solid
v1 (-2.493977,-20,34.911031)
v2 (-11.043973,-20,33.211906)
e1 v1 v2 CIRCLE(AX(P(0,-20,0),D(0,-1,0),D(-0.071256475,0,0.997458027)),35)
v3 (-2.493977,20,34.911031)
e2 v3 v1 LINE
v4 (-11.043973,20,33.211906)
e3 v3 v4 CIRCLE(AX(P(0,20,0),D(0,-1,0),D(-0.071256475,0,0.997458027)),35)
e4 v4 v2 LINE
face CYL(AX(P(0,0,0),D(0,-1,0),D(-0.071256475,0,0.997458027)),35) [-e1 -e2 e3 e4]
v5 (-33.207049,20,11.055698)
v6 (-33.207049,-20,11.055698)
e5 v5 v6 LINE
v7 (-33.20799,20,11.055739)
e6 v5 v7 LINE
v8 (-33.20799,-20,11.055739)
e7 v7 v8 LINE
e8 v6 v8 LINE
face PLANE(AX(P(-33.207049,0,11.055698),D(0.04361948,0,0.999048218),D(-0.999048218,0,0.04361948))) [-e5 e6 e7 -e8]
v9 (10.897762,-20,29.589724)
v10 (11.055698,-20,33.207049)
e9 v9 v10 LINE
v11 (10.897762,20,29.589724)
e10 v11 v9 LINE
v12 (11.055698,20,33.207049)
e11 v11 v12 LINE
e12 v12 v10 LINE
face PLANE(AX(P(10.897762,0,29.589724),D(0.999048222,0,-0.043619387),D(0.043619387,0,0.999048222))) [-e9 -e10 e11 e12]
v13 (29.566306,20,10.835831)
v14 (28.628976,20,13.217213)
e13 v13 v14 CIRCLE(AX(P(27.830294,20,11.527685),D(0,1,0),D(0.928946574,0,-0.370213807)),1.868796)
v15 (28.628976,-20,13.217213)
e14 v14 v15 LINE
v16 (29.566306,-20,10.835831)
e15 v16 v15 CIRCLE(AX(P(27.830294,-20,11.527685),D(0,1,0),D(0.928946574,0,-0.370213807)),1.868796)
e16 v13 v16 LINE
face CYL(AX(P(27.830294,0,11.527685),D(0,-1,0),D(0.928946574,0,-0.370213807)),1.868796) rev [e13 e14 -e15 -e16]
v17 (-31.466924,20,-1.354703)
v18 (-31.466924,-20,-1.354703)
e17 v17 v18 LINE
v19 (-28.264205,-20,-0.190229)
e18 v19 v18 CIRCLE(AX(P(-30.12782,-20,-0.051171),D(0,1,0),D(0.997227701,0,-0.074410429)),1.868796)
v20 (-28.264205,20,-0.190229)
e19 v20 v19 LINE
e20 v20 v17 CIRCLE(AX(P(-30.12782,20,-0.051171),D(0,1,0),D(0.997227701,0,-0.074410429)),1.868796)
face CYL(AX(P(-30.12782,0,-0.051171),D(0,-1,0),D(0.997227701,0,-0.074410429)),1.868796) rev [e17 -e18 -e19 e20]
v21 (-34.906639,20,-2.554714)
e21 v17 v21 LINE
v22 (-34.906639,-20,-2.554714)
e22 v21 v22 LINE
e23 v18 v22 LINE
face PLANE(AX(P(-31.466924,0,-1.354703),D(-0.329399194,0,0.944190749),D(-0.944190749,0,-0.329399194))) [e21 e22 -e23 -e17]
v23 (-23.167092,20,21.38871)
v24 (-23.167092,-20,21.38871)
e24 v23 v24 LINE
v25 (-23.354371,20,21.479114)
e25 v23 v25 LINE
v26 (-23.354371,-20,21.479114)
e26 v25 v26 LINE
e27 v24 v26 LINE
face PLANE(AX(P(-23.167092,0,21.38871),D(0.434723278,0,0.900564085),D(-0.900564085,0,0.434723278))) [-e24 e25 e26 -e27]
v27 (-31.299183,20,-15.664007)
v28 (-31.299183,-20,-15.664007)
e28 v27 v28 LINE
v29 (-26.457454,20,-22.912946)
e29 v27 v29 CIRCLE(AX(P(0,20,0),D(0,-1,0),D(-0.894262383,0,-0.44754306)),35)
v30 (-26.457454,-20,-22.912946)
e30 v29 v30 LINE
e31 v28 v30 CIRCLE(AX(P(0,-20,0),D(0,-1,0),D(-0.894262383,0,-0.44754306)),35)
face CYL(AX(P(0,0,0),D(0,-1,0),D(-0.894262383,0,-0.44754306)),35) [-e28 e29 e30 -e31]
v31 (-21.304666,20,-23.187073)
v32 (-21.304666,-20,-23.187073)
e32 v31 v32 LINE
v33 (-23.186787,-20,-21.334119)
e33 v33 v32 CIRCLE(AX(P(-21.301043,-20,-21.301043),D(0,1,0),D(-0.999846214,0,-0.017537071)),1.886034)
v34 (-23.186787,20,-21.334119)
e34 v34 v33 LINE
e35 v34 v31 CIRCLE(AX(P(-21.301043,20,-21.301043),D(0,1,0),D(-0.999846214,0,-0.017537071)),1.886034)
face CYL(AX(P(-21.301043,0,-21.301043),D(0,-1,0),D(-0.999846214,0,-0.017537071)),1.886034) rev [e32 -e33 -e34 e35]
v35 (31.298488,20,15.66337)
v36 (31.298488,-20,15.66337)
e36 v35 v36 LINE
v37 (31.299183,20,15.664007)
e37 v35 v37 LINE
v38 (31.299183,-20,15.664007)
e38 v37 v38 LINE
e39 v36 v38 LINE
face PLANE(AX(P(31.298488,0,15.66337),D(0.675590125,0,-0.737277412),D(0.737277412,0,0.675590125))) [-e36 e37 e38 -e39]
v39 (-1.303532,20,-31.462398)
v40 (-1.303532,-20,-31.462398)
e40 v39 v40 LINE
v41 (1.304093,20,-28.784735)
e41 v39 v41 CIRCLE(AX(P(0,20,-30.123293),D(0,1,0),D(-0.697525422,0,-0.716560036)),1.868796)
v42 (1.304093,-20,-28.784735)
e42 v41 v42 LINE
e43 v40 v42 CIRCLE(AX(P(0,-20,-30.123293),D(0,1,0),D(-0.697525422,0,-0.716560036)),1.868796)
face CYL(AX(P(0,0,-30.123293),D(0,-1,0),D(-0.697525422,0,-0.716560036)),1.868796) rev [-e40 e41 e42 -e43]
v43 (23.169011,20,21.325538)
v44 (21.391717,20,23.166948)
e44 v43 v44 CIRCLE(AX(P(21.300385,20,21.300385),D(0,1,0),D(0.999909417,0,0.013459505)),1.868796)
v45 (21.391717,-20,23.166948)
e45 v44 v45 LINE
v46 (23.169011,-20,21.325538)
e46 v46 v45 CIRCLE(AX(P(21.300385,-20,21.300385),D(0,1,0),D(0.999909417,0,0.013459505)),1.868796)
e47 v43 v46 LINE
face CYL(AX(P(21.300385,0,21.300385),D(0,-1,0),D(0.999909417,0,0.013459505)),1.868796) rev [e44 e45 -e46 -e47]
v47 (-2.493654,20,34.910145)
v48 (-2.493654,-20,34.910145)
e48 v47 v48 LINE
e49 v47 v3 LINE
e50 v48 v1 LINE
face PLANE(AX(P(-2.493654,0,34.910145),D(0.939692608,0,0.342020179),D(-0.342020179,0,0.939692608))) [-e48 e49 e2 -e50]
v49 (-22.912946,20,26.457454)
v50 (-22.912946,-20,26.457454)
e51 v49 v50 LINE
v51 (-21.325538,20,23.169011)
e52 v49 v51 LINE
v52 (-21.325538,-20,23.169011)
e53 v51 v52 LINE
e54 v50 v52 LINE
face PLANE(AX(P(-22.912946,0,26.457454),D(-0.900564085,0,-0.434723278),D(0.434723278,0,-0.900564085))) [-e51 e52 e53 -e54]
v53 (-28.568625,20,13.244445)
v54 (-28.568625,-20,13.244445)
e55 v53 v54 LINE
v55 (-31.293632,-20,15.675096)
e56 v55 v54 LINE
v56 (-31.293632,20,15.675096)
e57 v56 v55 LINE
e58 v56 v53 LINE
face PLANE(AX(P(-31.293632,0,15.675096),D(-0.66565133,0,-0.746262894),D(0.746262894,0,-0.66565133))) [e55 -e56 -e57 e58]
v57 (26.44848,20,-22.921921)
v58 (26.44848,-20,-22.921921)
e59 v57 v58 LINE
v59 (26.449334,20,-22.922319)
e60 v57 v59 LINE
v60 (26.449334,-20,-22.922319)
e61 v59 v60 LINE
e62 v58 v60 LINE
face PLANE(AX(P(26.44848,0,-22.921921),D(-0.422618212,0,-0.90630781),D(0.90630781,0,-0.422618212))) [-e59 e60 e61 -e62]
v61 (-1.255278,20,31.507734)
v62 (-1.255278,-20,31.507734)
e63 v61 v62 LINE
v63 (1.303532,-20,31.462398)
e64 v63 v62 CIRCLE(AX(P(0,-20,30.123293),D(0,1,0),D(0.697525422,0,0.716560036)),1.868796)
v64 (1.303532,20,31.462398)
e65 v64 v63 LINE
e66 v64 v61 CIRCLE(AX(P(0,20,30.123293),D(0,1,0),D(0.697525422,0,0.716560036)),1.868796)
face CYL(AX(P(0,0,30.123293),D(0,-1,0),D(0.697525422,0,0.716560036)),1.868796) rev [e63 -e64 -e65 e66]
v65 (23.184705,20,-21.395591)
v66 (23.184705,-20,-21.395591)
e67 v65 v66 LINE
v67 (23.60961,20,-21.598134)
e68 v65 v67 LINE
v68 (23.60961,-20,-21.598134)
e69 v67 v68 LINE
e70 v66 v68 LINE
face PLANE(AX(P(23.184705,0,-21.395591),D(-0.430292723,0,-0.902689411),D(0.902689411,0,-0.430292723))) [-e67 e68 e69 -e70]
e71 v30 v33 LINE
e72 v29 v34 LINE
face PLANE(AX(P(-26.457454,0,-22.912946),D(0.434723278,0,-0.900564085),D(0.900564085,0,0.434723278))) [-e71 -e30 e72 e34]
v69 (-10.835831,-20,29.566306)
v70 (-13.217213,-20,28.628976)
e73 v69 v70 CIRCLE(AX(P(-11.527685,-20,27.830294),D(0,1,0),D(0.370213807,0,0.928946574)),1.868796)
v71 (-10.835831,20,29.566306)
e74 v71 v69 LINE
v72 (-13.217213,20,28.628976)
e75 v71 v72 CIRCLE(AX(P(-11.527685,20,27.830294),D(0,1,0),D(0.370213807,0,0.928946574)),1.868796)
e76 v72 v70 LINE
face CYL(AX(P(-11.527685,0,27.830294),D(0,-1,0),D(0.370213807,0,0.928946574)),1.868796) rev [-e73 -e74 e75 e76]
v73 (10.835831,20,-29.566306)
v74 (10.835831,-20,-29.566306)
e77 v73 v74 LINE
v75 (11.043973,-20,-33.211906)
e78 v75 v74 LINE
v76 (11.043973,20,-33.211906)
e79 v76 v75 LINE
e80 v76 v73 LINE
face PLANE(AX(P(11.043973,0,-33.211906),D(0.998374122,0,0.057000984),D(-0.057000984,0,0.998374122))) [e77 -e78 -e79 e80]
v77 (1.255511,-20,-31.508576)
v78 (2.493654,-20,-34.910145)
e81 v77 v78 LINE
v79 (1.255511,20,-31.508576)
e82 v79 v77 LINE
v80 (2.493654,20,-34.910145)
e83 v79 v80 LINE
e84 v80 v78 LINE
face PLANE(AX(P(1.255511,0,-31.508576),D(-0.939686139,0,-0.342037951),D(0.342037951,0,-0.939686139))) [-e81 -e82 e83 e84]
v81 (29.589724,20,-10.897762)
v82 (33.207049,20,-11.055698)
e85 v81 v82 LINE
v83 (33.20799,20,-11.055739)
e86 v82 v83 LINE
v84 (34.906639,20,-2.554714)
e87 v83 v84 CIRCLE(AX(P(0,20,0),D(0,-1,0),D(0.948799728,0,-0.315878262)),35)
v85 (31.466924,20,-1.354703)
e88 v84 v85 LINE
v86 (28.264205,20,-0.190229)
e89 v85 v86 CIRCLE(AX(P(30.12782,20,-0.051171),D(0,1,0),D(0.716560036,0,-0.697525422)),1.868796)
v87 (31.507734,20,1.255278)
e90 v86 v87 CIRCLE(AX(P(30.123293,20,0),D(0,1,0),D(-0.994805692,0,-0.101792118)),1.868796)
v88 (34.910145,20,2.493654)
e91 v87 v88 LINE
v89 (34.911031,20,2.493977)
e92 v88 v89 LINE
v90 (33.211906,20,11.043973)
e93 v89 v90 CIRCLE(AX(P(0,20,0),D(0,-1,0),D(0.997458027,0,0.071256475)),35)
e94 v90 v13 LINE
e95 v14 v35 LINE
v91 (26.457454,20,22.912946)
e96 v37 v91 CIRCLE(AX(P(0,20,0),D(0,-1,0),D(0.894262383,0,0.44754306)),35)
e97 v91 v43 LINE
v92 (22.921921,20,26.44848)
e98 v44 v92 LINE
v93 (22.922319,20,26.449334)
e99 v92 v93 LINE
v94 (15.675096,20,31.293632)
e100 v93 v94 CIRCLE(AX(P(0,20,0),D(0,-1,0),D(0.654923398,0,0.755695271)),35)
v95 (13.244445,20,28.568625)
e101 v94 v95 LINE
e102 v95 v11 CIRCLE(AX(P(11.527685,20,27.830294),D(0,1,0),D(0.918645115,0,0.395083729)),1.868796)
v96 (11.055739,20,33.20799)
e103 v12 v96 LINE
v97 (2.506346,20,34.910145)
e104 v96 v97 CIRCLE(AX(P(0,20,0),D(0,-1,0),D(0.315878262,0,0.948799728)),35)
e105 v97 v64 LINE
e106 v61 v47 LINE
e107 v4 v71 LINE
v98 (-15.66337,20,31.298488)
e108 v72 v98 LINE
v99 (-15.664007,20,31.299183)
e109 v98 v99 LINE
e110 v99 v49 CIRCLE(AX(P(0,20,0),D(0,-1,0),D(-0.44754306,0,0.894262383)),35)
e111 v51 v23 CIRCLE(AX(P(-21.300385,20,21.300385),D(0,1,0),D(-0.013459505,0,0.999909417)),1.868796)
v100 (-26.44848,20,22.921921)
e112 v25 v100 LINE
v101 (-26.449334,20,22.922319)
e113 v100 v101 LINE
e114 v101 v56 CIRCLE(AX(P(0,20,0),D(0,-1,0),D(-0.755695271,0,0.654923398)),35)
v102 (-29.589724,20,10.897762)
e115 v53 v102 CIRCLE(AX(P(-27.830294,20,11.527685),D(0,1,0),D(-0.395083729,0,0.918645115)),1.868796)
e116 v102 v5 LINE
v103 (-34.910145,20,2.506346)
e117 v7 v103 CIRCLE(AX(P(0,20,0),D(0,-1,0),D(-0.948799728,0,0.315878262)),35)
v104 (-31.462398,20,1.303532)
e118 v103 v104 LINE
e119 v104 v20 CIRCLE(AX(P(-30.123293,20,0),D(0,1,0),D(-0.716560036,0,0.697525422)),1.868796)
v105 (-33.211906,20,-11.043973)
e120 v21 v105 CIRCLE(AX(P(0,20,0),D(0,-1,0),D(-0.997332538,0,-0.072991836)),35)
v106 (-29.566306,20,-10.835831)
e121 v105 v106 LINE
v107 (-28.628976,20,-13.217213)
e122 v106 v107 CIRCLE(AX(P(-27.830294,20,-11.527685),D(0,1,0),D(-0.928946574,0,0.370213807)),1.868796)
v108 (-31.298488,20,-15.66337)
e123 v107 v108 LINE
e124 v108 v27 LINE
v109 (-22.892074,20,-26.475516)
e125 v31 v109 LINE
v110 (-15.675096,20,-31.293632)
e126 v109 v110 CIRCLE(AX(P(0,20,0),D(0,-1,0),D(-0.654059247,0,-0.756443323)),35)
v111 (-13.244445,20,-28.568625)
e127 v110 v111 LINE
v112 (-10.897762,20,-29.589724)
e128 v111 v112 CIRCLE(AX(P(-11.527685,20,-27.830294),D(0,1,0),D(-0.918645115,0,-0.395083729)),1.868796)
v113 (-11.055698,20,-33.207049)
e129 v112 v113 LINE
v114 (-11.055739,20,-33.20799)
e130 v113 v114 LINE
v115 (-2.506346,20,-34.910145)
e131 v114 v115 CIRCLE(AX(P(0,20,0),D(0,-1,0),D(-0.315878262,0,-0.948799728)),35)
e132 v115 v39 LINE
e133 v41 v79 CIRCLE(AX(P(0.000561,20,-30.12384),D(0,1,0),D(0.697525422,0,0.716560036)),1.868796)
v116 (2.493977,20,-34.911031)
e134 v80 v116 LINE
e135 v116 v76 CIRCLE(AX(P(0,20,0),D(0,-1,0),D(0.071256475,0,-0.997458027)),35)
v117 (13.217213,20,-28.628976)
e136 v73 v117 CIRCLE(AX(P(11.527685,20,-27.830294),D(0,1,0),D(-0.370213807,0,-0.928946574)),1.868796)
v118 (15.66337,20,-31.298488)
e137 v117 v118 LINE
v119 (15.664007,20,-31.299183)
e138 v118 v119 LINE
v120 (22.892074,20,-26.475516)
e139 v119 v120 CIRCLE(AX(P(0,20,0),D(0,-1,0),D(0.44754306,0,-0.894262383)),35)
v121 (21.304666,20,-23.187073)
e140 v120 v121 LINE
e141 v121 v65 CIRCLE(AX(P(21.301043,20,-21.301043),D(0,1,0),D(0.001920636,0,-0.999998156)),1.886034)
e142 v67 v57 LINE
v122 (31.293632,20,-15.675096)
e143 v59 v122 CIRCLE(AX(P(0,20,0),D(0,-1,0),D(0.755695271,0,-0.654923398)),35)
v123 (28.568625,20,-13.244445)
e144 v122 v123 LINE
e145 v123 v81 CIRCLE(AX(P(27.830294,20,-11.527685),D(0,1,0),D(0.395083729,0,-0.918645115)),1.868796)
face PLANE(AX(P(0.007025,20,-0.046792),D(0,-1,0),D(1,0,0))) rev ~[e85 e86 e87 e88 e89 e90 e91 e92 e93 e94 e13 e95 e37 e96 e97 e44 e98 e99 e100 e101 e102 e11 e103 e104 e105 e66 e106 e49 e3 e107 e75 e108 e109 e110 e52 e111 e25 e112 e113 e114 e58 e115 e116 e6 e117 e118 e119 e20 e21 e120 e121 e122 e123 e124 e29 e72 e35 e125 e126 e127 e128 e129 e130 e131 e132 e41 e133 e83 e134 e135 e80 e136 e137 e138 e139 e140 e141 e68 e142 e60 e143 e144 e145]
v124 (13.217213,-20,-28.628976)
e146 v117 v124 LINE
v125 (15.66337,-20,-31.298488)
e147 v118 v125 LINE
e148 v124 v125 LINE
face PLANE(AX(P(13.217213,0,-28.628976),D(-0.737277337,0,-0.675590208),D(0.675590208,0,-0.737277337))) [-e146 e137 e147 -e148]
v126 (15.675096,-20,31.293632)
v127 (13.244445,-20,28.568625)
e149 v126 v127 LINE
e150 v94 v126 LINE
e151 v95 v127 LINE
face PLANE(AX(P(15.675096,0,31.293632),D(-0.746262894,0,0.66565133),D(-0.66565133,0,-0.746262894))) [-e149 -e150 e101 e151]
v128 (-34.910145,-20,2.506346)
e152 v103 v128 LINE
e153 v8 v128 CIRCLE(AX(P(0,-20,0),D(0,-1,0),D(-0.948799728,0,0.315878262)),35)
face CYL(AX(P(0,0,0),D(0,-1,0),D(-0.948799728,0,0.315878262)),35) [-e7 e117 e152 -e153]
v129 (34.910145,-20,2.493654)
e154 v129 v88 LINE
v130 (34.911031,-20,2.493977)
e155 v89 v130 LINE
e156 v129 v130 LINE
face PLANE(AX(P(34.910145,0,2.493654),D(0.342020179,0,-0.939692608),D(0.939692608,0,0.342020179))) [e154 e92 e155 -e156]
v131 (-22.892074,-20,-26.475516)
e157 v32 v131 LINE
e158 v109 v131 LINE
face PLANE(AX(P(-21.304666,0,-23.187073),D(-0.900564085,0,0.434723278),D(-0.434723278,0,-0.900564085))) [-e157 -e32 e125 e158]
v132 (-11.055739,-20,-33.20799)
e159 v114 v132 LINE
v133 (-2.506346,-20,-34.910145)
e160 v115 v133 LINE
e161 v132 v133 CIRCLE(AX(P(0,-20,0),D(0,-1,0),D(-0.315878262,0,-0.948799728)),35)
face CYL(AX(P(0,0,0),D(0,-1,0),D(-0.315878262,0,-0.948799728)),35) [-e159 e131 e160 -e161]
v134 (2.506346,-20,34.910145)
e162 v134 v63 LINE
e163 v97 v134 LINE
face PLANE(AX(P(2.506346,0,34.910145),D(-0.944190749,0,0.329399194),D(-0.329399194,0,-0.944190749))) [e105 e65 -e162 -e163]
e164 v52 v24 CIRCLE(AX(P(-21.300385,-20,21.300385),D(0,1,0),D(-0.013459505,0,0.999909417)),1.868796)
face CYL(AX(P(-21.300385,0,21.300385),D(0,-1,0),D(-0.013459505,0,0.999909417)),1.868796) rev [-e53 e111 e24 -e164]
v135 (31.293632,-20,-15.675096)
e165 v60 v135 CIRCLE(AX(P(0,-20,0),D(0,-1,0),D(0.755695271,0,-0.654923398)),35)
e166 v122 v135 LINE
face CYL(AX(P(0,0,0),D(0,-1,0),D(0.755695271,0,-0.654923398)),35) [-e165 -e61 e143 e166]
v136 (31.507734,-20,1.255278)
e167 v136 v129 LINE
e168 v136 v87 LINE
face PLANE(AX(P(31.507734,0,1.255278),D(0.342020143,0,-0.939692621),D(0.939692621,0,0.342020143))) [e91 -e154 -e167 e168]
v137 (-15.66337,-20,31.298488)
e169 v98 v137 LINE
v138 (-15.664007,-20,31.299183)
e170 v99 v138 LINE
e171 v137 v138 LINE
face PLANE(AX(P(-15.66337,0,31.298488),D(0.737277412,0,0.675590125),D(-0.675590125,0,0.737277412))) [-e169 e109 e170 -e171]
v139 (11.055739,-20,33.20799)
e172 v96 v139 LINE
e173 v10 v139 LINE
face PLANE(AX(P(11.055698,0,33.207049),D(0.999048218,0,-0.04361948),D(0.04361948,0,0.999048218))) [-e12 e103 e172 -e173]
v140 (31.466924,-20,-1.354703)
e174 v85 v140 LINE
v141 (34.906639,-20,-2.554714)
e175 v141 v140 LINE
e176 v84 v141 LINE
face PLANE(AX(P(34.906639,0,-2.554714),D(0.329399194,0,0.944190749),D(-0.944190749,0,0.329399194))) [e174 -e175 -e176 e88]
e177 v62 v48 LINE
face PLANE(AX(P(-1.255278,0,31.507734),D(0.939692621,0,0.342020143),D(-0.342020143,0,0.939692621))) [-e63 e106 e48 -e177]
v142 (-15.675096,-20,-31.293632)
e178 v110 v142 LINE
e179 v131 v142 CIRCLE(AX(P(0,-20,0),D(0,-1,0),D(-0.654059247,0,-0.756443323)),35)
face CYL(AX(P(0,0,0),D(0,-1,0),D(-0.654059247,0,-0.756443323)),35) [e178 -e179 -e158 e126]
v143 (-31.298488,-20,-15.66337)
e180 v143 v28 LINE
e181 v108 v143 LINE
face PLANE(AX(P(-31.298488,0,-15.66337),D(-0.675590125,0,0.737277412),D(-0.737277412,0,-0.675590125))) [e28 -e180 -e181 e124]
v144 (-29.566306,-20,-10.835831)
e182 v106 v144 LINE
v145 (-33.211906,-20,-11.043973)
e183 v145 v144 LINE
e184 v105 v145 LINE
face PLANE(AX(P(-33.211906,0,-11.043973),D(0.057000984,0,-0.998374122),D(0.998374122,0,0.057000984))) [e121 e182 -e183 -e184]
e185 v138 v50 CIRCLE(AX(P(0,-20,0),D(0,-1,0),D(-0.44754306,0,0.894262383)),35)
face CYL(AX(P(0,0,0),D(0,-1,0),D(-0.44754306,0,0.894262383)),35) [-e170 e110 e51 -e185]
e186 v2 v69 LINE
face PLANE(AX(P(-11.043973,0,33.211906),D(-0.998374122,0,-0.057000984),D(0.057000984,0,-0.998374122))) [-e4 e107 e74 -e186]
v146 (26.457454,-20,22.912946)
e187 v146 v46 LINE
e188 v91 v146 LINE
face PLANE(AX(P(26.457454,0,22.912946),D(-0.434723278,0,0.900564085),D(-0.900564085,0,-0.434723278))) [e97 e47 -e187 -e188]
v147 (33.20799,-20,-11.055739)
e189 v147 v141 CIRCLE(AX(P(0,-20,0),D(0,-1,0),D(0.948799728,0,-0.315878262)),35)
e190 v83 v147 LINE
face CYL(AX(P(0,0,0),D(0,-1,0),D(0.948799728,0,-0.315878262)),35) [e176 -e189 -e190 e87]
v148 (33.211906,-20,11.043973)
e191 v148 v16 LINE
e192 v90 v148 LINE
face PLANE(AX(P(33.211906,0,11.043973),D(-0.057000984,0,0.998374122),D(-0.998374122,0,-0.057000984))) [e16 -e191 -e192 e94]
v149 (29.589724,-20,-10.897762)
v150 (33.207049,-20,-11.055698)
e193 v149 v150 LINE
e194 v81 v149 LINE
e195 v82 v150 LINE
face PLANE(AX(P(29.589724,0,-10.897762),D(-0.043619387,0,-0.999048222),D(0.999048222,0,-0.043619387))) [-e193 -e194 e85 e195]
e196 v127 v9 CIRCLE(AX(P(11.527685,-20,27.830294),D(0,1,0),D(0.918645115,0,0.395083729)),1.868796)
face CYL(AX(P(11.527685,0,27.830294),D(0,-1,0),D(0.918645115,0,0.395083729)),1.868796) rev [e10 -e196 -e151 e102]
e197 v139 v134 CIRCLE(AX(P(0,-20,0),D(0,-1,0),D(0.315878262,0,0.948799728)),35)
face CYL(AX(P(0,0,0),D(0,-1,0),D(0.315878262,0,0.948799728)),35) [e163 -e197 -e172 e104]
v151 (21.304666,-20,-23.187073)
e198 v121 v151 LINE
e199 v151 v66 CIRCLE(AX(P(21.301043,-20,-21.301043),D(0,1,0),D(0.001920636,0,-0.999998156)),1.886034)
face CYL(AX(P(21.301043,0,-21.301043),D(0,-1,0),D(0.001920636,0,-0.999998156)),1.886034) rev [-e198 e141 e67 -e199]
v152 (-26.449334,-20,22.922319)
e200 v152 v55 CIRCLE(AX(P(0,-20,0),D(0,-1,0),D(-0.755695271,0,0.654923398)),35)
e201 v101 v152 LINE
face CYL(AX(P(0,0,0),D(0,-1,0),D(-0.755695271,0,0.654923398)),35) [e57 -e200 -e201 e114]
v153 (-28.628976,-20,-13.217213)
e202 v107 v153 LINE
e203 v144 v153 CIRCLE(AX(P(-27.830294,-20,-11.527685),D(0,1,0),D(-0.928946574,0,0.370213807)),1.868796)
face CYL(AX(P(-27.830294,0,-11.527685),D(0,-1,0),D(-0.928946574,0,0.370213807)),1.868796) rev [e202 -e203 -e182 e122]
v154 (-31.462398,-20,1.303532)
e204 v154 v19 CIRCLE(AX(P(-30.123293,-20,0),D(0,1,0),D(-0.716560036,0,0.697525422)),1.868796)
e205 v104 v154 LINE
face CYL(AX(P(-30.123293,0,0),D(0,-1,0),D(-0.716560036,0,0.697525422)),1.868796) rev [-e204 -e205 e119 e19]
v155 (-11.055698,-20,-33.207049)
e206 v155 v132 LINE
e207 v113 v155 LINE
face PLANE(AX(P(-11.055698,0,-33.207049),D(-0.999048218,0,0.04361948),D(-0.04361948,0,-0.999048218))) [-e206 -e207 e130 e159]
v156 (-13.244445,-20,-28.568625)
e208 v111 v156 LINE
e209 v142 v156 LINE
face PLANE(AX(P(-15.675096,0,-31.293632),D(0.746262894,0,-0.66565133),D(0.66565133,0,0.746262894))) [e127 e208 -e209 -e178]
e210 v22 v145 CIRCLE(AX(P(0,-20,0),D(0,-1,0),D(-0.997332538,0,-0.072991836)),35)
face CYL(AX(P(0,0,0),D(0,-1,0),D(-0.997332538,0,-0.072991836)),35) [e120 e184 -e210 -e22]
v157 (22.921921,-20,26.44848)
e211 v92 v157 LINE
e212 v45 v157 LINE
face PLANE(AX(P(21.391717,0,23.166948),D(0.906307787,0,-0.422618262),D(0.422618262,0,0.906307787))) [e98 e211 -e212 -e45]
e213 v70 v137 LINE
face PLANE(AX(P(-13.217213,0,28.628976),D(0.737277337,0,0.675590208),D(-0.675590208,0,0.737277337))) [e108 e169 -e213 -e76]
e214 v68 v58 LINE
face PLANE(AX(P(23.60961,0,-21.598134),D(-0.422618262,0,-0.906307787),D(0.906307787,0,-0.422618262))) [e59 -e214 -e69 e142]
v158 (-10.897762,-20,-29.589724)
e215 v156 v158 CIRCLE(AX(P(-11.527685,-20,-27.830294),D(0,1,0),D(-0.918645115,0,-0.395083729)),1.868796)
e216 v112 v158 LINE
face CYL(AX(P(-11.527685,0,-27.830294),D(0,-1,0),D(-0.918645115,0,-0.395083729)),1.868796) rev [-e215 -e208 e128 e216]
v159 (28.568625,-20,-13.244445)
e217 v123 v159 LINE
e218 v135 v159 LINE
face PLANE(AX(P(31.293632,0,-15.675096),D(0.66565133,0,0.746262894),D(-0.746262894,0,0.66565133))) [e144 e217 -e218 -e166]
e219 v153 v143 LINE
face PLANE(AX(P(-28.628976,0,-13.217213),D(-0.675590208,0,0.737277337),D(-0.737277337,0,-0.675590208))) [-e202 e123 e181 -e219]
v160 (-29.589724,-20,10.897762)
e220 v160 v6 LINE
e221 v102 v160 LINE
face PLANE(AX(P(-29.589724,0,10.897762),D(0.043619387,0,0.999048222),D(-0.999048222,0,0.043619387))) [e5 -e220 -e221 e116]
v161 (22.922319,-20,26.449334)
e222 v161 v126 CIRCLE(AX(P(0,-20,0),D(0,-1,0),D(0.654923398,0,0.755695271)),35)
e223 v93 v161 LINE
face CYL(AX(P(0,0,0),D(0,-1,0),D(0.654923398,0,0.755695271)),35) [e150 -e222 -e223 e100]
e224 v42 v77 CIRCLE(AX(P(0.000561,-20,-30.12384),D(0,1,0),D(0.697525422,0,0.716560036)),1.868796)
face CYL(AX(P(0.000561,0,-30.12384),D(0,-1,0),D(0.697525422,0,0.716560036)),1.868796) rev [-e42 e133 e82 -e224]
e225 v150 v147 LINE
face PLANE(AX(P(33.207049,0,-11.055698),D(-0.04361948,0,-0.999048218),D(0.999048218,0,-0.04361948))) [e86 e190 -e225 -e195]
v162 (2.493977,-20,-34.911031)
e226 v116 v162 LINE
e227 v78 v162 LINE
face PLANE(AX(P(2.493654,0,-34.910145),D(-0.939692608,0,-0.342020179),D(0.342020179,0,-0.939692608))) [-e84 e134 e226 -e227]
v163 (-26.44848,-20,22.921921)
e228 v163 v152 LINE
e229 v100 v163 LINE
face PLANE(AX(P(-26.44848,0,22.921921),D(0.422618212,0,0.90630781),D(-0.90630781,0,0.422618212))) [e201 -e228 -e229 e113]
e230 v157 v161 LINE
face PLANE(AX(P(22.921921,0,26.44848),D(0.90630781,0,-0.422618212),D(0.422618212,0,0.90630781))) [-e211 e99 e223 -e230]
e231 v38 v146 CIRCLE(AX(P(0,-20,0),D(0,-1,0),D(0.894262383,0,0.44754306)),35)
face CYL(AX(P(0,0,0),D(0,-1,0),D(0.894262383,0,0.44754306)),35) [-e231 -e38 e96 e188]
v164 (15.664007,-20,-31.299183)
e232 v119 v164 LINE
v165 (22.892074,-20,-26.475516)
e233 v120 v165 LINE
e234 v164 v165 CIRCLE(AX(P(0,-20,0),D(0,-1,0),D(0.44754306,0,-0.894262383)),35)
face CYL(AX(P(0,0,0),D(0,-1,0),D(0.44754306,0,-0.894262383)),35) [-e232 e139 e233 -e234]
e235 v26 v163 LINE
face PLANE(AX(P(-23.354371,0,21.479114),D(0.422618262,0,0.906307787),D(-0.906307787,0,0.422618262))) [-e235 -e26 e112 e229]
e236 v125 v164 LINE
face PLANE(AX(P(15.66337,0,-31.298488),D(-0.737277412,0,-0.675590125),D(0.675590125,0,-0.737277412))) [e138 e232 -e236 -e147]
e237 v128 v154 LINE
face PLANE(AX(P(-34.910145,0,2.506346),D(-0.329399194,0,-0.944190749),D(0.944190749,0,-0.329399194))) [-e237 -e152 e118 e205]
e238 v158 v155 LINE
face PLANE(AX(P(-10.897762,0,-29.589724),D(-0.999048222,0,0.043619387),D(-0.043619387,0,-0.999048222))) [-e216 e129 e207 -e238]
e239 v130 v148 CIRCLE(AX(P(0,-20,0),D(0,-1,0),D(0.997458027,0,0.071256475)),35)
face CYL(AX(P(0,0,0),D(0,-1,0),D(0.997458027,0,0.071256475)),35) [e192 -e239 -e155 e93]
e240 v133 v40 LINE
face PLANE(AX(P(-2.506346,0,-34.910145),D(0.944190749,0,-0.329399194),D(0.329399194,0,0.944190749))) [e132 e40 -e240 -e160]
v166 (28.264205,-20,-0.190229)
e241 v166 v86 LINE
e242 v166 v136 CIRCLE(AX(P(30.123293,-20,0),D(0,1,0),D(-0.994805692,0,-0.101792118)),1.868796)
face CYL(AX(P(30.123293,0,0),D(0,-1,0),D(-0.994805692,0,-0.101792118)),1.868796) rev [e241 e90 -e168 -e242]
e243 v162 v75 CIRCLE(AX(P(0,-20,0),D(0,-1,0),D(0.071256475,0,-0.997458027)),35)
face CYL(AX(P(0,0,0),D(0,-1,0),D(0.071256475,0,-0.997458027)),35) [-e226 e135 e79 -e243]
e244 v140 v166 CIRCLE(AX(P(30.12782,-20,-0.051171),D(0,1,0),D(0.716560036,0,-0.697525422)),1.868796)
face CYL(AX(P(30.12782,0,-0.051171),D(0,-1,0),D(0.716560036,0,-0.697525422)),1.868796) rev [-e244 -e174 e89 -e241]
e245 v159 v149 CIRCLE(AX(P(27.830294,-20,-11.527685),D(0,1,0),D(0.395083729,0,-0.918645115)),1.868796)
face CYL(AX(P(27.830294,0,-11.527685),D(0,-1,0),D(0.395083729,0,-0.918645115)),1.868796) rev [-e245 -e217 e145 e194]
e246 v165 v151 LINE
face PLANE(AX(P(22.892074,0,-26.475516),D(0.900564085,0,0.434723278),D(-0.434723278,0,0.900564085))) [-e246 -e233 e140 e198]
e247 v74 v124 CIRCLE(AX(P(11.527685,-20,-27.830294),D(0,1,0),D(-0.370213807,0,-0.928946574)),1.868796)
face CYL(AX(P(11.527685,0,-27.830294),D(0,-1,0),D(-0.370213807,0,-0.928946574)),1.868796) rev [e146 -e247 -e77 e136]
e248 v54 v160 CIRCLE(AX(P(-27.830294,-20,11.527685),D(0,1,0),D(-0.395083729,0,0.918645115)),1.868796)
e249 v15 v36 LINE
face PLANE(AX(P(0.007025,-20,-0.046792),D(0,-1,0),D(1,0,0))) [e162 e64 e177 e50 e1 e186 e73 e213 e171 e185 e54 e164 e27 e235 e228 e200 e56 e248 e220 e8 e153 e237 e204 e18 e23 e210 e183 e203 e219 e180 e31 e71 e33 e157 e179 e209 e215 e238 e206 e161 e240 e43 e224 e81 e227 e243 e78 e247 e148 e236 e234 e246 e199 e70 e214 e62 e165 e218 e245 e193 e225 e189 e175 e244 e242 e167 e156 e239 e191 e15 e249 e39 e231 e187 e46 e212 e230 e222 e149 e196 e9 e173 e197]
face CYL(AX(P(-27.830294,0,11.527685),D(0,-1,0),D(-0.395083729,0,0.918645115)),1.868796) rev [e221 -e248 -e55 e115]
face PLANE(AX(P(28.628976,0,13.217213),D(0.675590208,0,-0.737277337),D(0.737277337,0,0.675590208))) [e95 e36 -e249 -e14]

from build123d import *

# Parameters (mm, degrees)
F1_DEPTH = 20


# Not quite as in the source:
# - ends of sketch curves that miss each other by under 0.0002 mm in the source are joined


with BuildPart() as f1:
    # F0 (on Front) → F1 (new body, symmetric)
    with BuildSketch(Plane.XZ):
        with BuildLine():
            Line((34.9101450984, 2.4936542119), (34.9110309298, 2.4939766282))
            ThreePointArc((34.9110309298, 2.4939766282), (34.3286939173, 6.8220798831), (33.2119055423, 11.0439725756))
            Line((33.2119055423, 11.0439725756), (29.5663055038, 10.8358313755))
            ThreePointArc((29.5663055038, 10.8358313755), (26.0913542461, 10.8432258269), (28.6289762641, 13.2172130666))
            Line((28.6289762641, 13.2172130666), (31.2984883804, 15.6633702382))
            Line((31.2984883804, 15.6633702382), (31.2991833986, 15.6640071049))
            ThreePointArc((31.2991833986, 15.6640071049), (29.1048807425, 19.4398023901), (26.457454434, 22.9129462285))
            Line((26.457454434, 22.9129462285), (23.1690113636, 21.3255380981))
            ThreePointArc((23.1690113636, 21.3255380981), (19.9557452862, 20.0025634058), (21.3917167446, 23.1669475309))
            Line((21.3917167446, 23.1669475309), (22.9219205281, 26.4484801345))
            Line((22.9219205281, 26.4484801345), (22.9223189227, 26.4493344946))
            ThreePointArc((22.9223189227, 26.4493344946), (19.450113311, 29.0979912054), (15.6750957256, 31.2936315245))
            Line((15.6750957256, 31.2936315245), (13.2444452709, 28.5686249618))
            ThreePointArc((13.2444452709, 28.5686249618), (10.7820550057, 26.1166920299), (10.897762267, 29.5897242426))
            Line((10.897762267, 29.5897242426), (11.055698063, 33.2070486864))
            Line((11.055698063, 33.2070486864), (11.0557391823, 33.2079904712))
            ThreePointArc((11.0557391823, 33.2079904712), (6.8342424437, 34.3262746336), (2.5063457881, 34.9101450984))
            Line((2.5063457881, 34.9101450984), (1.3035324469, 31.4623976502))
            ThreePointArc((1.3035324469, 31.4623976502), (-0.0331054099, 28.2547910408), (-1.2552777272, 31.5077336698))
            Line((-1.2552777272, 31.5077336698), (-2.4936542119, 34.9101450984))
            Line((-2.4936542119, 34.9101450984), (-2.4939766282, 34.9110309298))
            ThreePointArc((-2.4939766282, 34.9110309298), (-6.8220798831, 34.3286939173), (-11.0439725756, 33.2119055423))
            Line((-11.0439725756, 33.2119055423), (-10.8358313755, 29.5663055038))
            ThreePointArc((-10.8358313755, 29.5663055038), (-10.8432258269, 26.0913542461), (-13.2172130666, 28.6289762641))
            Line((-13.2172130666, 28.6289762641), (-15.6633702382, 31.2984883804))
            Line((-15.6633702382, 31.2984883804), (-15.6640071049, 31.2991833986))
            ThreePointArc((-15.6640071049, 31.2991833986), (-19.4398023901, 29.1048807425), (-22.9129462285, 26.457454434))
            Line((-22.9129462285, 26.457454434), (-21.3255380981, 23.1690113636))
            ThreePointArc((-21.3255380981, 23.1690113636), (-20.0014808321, 19.9567910089), (-23.1670922293, 21.3887099076))
            Line((-23.1670922293, 21.3887099076), (-23.3543714527, 21.4791139546))
            Line((-23.3543714527, 21.4791139546), (-26.4484801345, 22.9219205281))
            Line((-26.4484801345, 22.9219205281), (-26.4493344946, 22.9223189227))
            ThreePointArc((-26.4493344946, 22.9223189227), (-29.0979912054, 19.450113311), (-31.2936315245, 15.6750957256))
            Line((-31.2936315245, 15.6750957256), (-28.5686249618, 13.2444452709))
            ThreePointArc((-28.5686249618, 13.2444452709), (-26.1166920299, 10.7820550057), (-29.5897242426, 10.897762267))
            Line((-29.5897242426, 10.897762267), (-33.2070486864, 11.055698063))
            Line((-33.2070486864, 11.055698063), (-33.2079904712, 11.0557391823))
            ThreePointArc((-33.2079904712, 11.0557391823), (-34.3262746336, 6.8342424437), (-34.9101450984, 2.5063457881))
            Line((-34.9101450984, 2.5063457881), (-31.4623976502, 1.3035324469))
            ThreePointArc((-31.4623976502, 1.3035324469), (-29.3324543071, 1.6932130885), (-28.2642048894, -0.1902286623))
            ThreePointArc((-28.2642048894, -0.1902286623), (-29.4892446104, -1.8074791131), (-31.4669238904, -1.3547032257))
            Line((-31.4669238904, -1.3547032257), (-34.9066388382, -2.5547142739))
            ThreePointArc((-34.9066388382, -2.5547142739), (-34.3227460841, -6.8519414215), (-33.2119055423, -11.0439725756))
            Line((-33.2119055423, -11.0439725756), (-29.5663055038, -10.8358313755))
            ThreePointArc((-29.5663055038, -10.8358313755), (-26.0913542461, -10.8432258269), (-28.6289762641, -13.2172130666))
            Line((-28.6289762641, -13.2172130666), (-31.2984883804, -15.6633702382))
            Line((-31.2984883804, -15.6633702382), (-31.2991833986, -15.6640071049))
            ThreePointArc((-31.2991833986, -15.6640071049), (-29.1048807425, -19.4398023901), (-26.457454434, -22.9129462285))
            Line((-26.457454434, -22.9129462285), (-23.1867866645, -21.3341186503))
            ThreePointArc((-23.1867866645, -21.3341186503), (-19.9778704256, -19.9570429396), (-21.3046655311, -23.1870732319))
            Line((-21.3046655311, -23.1870732319), (-22.8920736615, -26.4755163023))
            ThreePointArc((-22.8920736615, -26.4755163023), (-19.4334813455, -29.1091017174), (-15.6750957256, -31.2936315245))
            Line((-15.6750957256, -31.2936315245), (-13.2444452709, -28.5686249618))
            ThreePointArc((-13.2444452709, -28.5686249618), (-10.7820550057, -26.1166920299), (-10.897762267, -29.5897242426))
            Line((-10.897762267, -29.5897242426), (-11.055698063, -33.2070486864))
            Line((-11.055698063, -33.2070486864), (-11.0557391823, -33.2079904712))
            ThreePointArc((-11.0557391823, -33.2079904712), (-6.8342424437, -34.3262746336), (-2.5063457881, -34.9101450984))
            Line((-2.5063457881, -34.9101450984), (-1.3035324469, -31.4623976502))
            ThreePointArc((-1.3035324469, -31.4623976502), (-1.3388311966, -28.8194805066), (1.3040932823, -28.7847353157))
            ThreePointArc((1.3040932823, -28.7847353157), (1.8690592706, -30.1571657006), (1.2555114416, -31.5085763676))
            Line((1.2555114416, -31.5085763676), (2.4936542119, -34.9101450984))
            Line((2.4936542119, -34.9101450984), (2.4939766282, -34.9110309298))
            ThreePointArc((2.4939766282, -34.9110309298), (6.8220798831, -34.3286939173), (11.0439725756, -33.2119055423))
            Line((11.0439725756, -33.2119055423), (10.8358313755, -29.5663055038))
            ThreePointArc((10.8358313755, -29.5663055038), (10.8432258269, -26.0913542461), (13.2172130666, -28.6289762641))
            Line((13.2172130666, -28.6289762641), (15.6633702382, -31.2984883804))
            Line((15.6633702382, -31.2984883804), (15.6640071049, -31.2991833986))
            ThreePointArc((15.6640071049, -31.2991833986), (19.4283242222, -29.112543996), (22.8920736615, -26.4755163023))
            Line((22.8920736615, -26.4755163023), (21.3046655311, -23.1870732319))
            ThreePointArc((21.3046655311, -23.1870732319), (19.9999615902, -19.9356459921), (23.1847053682, -21.3955906956))
            Line((23.1847053682, -21.3955906956), (23.6096103837, -21.5981338228))
            Line((23.6096103837, -21.5981338228), (26.4484801345, -22.9219205281))
            Line((26.4484801345, -22.9219205281), (26.4493344946, -22.9223189227))
            ThreePointArc((26.4493344946, -22.9223189227), (29.0979912054, -19.450113311), (31.2936315245, -15.6750957256))
            Line((31.2936315245, -15.6750957256), (28.5686249618, -13.2444452709))
            ThreePointArc((28.5686249618, -13.2444452709), (26.1166920299, -10.7820550057), (29.5897242426, -10.897762267))
            Line((29.5897242426, -10.897762267), (33.2070486864, -11.055698063))
            Line((33.2070486864, -11.055698063), (33.2079904712, -11.0557391823))
            ThreePointArc((33.2079904712, -11.0557391823), (34.3215316909, -6.8580217548), (34.9066388382, -2.5547142739))
            Line((34.9066388382, -2.5547142739), (31.4669238904, -1.3547032257))
            ThreePointArc((31.4669238904, -1.3547032257), (29.4892446104, -1.8074791131), (28.2642048894, -0.1902286623))
            ThreePointArc((28.2642048894, -0.1902286623), (29.3625733997, 1.7069569752), (31.5077336698, 1.2552777272))
            Line((31.5077336698, 1.2552777272), (34.9101450984, 2.4936542119))
        make_face()
    extrude(amount=F1_DEPTH, both=True)


solid = f1.part
